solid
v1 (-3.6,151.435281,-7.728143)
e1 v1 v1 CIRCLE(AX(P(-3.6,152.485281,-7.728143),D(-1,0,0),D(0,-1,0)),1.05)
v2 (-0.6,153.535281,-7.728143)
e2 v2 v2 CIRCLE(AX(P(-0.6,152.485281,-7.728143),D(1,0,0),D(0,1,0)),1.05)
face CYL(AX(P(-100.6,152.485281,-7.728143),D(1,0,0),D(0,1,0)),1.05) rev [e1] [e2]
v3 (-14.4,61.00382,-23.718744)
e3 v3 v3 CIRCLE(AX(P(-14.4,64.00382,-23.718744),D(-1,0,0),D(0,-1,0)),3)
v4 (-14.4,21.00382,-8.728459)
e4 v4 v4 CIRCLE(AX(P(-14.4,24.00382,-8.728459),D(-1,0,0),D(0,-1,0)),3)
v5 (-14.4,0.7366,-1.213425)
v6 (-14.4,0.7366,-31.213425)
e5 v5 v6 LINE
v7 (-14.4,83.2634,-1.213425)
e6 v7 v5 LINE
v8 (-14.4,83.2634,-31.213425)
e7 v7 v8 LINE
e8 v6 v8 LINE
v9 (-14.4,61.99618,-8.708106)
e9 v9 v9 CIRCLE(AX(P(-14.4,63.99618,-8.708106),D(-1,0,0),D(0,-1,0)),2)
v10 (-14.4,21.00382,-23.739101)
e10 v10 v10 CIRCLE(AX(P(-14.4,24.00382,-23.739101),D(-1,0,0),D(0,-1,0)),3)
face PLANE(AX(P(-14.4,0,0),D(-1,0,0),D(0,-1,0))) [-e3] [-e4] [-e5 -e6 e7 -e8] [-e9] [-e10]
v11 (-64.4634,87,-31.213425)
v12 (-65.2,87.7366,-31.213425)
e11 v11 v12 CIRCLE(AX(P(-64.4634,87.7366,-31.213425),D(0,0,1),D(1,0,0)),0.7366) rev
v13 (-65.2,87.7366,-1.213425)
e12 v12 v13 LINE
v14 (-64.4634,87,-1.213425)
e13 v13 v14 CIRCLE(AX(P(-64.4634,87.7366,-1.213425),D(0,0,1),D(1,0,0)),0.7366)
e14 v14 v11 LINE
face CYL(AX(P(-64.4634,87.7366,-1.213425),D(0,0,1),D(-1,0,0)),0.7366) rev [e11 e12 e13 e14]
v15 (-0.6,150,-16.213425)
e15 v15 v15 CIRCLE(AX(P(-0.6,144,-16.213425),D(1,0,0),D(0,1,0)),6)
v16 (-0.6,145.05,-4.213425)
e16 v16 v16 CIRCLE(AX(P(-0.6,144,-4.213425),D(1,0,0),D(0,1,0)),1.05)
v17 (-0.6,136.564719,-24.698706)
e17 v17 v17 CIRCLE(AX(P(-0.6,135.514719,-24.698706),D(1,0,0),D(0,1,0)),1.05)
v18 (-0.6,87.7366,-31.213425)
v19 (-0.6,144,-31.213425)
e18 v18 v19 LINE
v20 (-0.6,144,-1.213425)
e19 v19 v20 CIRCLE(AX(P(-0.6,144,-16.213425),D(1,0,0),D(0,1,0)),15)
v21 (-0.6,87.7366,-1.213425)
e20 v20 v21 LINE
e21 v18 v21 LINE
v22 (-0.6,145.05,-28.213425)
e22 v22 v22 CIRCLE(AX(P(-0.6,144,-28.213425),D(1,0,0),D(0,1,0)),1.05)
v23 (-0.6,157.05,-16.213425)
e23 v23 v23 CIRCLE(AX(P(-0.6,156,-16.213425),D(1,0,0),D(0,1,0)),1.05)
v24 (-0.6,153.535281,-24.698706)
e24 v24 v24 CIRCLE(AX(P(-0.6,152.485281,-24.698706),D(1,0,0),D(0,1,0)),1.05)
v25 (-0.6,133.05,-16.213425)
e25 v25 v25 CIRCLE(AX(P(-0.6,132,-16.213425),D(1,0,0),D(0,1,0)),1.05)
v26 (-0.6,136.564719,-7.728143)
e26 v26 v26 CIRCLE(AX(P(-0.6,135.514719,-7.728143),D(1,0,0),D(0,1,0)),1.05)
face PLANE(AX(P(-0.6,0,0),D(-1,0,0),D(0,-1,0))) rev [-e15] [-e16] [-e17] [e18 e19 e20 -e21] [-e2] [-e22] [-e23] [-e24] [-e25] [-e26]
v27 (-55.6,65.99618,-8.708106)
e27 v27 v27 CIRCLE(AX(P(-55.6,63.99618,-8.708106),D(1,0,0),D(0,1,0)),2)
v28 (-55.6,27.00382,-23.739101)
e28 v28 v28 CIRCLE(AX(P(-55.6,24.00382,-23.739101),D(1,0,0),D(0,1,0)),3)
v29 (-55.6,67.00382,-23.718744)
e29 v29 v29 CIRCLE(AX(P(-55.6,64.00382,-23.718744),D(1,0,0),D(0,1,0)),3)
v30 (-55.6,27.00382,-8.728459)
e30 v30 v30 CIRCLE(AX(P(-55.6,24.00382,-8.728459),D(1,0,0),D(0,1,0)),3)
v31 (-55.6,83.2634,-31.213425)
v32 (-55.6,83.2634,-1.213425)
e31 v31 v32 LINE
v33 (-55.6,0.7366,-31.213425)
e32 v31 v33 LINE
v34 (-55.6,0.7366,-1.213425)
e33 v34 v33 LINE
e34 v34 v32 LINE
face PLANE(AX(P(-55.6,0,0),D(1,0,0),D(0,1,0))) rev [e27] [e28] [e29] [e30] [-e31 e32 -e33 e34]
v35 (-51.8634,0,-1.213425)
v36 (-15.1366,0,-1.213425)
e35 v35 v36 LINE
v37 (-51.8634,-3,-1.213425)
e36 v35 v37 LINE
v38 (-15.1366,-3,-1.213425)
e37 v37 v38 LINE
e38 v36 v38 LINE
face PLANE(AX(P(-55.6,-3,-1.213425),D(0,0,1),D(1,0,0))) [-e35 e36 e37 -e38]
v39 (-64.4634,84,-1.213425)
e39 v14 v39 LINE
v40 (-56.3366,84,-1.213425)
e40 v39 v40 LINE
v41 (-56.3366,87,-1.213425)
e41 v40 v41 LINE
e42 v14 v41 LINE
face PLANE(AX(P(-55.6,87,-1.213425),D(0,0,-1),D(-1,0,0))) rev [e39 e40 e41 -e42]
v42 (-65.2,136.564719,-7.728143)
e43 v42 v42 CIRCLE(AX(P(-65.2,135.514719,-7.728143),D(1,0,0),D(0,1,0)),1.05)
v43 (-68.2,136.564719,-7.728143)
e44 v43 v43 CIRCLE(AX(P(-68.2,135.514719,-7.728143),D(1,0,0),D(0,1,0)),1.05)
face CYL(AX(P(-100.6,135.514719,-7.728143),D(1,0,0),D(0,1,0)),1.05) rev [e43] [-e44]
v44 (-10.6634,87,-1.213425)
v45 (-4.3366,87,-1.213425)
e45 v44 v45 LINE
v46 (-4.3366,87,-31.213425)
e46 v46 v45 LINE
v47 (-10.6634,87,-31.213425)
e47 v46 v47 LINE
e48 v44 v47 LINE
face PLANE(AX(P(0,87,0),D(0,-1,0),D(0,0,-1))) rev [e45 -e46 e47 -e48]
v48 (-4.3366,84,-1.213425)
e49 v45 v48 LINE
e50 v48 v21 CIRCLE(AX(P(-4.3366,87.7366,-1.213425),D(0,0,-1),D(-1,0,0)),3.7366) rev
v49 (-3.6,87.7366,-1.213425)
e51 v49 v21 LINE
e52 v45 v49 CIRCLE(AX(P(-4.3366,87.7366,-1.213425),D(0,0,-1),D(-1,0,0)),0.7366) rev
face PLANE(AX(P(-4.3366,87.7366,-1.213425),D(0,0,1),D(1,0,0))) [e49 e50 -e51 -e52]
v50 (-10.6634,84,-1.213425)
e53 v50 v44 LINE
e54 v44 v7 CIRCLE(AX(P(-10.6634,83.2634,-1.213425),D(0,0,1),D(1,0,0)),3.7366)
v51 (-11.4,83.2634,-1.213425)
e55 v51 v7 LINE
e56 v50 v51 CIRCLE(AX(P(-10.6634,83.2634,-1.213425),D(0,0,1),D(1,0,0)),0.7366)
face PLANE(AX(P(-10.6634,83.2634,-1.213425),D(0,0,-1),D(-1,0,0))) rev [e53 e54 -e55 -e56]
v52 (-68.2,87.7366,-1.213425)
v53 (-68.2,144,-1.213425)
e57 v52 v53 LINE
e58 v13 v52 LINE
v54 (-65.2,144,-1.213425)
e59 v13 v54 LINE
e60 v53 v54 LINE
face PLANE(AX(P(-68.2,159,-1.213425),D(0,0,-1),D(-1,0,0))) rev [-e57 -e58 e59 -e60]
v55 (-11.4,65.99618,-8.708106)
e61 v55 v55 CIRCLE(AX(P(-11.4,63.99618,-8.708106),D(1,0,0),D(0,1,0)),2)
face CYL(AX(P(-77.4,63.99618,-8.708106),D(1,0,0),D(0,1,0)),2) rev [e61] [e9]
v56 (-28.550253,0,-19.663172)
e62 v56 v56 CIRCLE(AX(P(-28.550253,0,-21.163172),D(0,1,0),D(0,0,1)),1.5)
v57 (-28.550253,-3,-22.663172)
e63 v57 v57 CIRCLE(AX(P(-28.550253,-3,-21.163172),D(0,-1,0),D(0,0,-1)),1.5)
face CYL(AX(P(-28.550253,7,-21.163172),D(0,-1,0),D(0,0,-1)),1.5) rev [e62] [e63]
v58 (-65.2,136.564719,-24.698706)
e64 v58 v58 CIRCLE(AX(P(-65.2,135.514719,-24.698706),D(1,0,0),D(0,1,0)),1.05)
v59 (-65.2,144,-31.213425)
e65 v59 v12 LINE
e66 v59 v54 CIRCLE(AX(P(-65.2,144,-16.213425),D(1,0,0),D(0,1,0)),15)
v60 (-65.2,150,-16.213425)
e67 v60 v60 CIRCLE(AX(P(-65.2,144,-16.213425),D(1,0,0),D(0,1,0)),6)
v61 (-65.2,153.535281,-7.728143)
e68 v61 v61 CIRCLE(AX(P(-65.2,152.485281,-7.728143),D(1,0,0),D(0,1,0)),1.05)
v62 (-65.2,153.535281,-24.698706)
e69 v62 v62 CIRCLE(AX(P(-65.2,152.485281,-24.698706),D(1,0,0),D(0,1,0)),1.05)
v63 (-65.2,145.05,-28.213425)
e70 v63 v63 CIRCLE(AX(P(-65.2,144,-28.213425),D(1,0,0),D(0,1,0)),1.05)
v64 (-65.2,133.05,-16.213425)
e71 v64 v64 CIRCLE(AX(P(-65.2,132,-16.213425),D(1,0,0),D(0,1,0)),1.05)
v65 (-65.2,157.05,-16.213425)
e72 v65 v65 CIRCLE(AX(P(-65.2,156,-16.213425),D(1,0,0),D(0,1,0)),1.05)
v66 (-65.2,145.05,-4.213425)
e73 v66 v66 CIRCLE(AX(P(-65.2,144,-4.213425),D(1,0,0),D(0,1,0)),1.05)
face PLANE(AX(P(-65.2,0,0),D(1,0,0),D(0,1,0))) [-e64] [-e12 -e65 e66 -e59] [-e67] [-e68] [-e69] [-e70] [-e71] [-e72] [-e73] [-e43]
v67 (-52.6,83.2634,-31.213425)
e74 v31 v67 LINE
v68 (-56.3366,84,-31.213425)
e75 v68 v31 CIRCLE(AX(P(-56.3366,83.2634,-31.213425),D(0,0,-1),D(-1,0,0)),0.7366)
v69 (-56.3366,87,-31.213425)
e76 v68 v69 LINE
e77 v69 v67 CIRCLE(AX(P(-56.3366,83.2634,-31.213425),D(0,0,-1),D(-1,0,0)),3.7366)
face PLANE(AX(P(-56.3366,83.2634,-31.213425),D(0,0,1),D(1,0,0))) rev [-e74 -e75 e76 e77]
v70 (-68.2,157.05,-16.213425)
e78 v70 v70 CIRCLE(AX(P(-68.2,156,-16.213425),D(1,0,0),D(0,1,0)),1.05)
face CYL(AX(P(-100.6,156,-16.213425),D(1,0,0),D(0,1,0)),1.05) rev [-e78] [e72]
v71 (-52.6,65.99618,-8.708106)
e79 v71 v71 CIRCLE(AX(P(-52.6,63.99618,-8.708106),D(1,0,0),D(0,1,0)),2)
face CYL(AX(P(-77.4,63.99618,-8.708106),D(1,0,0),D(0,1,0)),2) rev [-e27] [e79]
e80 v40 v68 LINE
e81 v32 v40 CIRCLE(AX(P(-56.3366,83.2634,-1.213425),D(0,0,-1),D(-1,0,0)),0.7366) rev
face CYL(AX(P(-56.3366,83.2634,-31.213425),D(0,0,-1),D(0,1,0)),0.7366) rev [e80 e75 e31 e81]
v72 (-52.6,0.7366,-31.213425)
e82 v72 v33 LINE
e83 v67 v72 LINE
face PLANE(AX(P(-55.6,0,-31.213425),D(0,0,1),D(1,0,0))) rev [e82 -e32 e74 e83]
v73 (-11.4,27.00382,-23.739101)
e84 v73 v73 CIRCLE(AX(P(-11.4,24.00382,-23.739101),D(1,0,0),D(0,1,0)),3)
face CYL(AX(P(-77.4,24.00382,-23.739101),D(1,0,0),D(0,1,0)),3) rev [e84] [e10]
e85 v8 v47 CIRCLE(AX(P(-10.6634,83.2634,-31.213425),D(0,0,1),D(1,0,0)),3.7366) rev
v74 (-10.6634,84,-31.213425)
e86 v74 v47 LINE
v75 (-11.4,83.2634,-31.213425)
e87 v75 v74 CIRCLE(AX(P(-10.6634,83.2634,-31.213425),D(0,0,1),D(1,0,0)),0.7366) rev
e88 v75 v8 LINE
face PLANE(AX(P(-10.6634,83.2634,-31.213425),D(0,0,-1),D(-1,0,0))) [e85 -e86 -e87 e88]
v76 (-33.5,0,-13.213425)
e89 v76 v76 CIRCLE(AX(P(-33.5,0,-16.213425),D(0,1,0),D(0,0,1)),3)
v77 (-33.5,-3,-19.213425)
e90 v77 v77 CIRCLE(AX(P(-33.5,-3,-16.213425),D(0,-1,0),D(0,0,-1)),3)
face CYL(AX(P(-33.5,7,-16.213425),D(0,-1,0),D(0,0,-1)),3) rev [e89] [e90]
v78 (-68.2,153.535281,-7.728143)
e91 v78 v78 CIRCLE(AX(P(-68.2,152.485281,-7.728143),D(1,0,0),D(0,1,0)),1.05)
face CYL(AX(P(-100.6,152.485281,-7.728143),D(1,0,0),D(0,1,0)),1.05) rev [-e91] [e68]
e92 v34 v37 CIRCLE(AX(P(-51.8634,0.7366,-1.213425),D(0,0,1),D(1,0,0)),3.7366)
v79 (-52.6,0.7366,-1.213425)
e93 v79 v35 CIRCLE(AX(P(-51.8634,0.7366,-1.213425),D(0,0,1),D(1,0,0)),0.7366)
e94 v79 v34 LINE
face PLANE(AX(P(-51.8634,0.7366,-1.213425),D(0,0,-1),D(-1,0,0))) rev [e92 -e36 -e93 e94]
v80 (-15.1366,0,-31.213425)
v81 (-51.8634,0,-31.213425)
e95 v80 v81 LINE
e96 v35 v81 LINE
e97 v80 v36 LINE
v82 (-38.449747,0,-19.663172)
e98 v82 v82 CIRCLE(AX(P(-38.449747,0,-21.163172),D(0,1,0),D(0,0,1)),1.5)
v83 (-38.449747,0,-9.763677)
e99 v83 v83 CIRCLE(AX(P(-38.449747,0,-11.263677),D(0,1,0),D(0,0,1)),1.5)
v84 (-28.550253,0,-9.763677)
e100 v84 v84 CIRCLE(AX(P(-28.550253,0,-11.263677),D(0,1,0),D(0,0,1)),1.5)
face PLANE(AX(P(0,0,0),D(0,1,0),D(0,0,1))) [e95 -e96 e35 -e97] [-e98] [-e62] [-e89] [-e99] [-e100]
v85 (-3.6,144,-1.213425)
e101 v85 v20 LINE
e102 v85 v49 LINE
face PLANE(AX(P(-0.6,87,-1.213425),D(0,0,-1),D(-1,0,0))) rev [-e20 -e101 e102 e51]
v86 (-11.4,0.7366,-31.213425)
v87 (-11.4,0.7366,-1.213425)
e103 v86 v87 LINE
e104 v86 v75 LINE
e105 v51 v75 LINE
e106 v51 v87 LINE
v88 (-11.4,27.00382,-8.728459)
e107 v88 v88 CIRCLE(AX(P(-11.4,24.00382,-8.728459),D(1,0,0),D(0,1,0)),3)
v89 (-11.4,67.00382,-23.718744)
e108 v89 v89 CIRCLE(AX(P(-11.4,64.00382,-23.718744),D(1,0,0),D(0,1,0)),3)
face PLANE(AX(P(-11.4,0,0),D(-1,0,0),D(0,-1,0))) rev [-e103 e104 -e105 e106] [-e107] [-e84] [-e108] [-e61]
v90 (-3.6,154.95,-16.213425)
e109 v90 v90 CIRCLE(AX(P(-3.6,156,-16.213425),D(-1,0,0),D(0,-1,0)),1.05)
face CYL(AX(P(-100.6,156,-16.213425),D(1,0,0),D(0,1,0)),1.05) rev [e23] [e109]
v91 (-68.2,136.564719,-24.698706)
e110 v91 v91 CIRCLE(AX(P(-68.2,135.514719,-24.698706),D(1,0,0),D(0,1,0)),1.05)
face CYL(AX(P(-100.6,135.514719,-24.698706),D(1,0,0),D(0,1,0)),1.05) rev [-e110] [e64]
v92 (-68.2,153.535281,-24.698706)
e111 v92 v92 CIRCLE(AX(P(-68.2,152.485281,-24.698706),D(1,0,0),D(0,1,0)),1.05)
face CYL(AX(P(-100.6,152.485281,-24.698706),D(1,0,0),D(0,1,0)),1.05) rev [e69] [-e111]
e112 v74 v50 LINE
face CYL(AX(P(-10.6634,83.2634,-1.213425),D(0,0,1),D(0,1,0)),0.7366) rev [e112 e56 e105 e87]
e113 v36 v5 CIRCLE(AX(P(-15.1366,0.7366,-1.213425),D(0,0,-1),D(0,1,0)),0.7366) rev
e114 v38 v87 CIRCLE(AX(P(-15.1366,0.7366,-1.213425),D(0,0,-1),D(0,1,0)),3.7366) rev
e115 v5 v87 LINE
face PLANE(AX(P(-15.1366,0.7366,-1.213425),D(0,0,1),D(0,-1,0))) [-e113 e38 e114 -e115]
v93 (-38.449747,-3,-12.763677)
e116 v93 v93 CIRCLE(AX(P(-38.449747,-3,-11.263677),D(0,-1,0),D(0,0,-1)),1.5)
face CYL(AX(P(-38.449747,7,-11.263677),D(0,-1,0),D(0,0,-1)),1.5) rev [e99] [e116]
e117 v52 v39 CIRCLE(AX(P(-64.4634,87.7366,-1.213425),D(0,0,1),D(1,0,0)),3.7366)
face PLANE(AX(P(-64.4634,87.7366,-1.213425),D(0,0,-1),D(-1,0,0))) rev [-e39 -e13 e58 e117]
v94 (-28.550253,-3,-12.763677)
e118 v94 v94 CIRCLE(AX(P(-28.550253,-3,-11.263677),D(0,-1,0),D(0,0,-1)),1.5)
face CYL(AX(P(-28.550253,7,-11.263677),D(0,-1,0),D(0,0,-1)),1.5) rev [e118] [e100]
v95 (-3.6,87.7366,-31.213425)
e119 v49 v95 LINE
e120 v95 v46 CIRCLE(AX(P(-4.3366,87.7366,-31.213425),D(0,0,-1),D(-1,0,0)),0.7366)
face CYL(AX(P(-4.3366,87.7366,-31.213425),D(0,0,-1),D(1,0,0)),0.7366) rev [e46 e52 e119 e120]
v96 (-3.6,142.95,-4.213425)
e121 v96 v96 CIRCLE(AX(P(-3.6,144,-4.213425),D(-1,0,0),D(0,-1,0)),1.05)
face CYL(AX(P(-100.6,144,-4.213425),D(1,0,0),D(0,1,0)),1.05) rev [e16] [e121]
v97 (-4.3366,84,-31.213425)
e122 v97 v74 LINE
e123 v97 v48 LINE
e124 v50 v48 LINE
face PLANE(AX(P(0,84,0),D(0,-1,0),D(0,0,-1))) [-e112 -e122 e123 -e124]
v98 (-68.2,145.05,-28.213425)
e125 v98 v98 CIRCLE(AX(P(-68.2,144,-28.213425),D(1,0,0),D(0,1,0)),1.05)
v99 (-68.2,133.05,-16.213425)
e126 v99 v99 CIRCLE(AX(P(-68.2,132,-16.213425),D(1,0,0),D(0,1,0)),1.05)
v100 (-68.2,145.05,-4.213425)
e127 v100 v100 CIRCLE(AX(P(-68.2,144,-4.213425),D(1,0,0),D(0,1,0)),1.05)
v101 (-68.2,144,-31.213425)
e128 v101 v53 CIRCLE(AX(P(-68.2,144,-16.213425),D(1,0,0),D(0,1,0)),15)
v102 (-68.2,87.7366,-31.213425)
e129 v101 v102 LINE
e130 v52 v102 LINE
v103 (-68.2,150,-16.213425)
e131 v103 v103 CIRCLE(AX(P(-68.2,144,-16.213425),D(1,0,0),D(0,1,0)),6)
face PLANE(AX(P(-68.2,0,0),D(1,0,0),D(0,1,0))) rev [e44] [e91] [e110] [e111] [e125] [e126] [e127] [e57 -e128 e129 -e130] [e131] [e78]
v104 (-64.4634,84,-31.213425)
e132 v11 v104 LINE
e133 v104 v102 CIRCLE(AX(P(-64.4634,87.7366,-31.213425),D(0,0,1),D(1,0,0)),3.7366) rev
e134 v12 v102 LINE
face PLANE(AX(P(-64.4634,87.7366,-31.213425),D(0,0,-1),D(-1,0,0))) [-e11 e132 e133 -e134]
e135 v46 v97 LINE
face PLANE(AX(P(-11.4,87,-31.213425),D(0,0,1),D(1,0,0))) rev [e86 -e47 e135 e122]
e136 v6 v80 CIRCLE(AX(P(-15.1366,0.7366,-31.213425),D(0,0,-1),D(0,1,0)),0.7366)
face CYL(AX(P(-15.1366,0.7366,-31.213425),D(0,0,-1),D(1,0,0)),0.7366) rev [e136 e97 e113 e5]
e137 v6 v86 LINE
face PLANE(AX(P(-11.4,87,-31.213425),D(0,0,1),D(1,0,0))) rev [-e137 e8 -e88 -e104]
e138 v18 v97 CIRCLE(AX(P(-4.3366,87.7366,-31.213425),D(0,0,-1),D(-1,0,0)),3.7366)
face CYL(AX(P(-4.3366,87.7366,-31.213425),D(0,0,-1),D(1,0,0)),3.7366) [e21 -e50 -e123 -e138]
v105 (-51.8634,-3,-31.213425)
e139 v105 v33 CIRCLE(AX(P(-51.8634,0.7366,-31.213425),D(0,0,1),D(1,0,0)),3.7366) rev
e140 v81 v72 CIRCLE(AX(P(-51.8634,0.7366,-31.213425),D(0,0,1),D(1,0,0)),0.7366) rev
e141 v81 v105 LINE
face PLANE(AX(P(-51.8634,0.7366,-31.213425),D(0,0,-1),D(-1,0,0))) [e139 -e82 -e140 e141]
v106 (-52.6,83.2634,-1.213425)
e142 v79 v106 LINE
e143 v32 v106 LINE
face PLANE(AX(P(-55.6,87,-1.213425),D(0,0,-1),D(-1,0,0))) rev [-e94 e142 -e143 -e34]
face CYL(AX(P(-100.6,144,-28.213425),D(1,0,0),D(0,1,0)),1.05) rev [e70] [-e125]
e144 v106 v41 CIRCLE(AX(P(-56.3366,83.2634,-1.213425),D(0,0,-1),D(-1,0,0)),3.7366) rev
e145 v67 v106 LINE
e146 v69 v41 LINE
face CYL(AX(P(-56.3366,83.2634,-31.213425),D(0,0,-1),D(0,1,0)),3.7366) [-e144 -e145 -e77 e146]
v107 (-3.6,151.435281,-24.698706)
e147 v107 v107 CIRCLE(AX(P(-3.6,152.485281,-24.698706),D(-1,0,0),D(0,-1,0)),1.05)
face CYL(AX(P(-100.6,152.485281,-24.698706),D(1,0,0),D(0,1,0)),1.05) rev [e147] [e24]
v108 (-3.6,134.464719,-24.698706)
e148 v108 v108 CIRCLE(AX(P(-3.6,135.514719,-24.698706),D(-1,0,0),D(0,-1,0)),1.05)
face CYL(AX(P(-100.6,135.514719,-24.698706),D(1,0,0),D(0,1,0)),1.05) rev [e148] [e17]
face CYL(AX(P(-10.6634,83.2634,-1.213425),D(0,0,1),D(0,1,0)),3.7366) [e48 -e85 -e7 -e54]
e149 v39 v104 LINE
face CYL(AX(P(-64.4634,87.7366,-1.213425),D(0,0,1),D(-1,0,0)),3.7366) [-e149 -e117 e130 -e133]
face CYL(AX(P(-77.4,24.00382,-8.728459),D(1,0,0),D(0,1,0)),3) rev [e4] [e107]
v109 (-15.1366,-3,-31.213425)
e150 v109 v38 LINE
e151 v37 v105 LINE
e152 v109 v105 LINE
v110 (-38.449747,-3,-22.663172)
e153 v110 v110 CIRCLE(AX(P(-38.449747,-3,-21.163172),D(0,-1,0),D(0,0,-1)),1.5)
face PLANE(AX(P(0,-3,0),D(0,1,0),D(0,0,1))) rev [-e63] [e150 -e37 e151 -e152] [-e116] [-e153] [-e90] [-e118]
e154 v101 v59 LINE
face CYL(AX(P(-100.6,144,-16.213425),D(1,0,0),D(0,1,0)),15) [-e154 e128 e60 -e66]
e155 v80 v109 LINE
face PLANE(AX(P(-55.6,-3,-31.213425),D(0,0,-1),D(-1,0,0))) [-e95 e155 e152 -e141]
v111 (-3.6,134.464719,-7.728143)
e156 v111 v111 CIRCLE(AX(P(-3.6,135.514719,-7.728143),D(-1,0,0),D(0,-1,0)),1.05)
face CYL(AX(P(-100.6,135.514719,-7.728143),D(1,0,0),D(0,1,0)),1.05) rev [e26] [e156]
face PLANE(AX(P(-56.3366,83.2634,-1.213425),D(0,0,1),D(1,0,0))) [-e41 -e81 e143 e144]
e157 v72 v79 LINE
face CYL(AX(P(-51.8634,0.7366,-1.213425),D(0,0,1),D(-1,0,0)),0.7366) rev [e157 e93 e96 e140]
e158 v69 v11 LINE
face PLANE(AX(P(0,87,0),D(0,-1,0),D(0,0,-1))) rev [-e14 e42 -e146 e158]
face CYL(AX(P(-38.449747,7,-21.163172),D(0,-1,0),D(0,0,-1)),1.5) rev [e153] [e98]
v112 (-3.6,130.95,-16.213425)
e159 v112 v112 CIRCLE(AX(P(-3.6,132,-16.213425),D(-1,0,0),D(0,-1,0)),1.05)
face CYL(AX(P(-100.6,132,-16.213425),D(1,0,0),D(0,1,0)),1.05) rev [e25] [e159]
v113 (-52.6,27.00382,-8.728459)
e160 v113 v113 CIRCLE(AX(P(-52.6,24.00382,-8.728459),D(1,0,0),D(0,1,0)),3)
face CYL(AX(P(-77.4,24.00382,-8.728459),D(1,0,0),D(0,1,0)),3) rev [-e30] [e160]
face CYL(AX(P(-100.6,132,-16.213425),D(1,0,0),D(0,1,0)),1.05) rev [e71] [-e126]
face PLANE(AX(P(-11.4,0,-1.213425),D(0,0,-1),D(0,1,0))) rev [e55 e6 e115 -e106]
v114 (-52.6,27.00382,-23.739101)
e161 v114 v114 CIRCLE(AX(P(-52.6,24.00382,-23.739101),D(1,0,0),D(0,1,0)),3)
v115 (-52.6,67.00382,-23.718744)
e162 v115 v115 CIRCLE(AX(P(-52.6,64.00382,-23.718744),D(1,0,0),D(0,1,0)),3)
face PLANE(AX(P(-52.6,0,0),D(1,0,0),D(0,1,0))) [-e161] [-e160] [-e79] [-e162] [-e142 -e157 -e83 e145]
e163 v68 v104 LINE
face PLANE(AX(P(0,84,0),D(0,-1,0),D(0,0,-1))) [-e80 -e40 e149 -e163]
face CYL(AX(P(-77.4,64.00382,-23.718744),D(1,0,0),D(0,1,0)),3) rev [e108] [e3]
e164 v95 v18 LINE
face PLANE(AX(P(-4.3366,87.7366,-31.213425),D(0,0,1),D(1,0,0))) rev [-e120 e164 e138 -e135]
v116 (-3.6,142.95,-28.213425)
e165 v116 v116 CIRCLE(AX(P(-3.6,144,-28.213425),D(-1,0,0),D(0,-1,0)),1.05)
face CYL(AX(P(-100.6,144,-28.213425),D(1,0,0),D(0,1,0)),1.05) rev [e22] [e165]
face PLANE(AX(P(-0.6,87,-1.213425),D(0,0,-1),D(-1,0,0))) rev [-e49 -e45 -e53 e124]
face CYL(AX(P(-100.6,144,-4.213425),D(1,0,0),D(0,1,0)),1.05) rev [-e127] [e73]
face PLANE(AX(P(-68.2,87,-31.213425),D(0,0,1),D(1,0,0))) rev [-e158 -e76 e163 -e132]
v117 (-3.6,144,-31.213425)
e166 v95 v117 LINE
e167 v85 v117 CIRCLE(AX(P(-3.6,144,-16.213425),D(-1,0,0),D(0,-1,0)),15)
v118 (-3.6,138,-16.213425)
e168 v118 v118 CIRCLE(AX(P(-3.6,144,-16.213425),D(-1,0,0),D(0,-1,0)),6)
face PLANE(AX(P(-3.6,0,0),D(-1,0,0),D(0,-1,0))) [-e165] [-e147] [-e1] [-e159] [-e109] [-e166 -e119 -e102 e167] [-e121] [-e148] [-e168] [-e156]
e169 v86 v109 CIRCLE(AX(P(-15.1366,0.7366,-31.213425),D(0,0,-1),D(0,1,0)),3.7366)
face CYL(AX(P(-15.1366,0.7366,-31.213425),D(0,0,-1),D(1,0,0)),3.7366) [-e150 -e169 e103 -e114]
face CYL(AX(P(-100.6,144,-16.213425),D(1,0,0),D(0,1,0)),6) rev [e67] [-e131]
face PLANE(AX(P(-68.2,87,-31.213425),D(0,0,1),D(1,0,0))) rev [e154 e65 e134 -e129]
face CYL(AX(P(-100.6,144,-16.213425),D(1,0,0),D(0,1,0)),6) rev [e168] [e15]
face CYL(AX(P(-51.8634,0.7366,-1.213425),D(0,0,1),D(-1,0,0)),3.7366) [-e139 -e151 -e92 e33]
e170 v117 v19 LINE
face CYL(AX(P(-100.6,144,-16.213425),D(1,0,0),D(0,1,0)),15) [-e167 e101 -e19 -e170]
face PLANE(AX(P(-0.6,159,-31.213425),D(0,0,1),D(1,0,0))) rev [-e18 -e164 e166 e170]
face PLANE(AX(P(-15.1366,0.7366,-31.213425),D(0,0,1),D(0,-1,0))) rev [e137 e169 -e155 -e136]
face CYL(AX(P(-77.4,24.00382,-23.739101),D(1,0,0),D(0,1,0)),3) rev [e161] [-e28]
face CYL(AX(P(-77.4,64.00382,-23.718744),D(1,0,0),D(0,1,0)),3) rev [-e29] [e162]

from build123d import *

# Parameters (mm, degrees)
SKETCH_1_W                       = 44.2
SKETCH_1_H                       = 30
SM_BASE_FLANGE_1_DEPTH           = 3
SM_EDGE_FLANGE_1_STRIP_W         = 13.4732
SM_EDGE_FLANGE_1_STRIP_H         = 3
SM_EDGE_FLANGE_1_STRIP_CUT_DEPTH = 30
SM_EDGE_FLANGE_1_DEPTH           = 30
SM_EDGE_FLANGE_2_STRIP_W         = 13.4732
SM_EDGE_FLANGE_2_STRIP_H         = 3
SM_EDGE_FLANGE_2_STRIP_CUT_DEPTH = 30
SM_EDGE_FLANGE_2_DEPTH           = 30
SM_EDGE_FLANGE_3_STRIP_W         = 13.4732
SM_EDGE_FLANGE_3_STRIP_H         = 3
SM_EDGE_FLANGE_3_STRIP_CUT_DEPTH = 30
SM_EDGE_FLANGE_3_DEPTH           = 30
SM_EDGE_FLANGE_4_STRIP_W         = 13.4732
SM_EDGE_FLANGE_4_STRIP_H         = 3
SM_EDGE_FLANGE_4_STRIP_CUT_DEPTH = 30
SM_EDGE_FLANGE_4_DEPTH           = 30
SM_EDGE_FLANGE_5_STRIP_W         = 13.4732
SM_EDGE_FLANGE_5_STRIP_H         = 3
SM_EDGE_FLANGE_5_STRIP_CUT_DEPTH = 30
SM_EDGE_FLANGE_5_DEPTH           = 30
SM_EDGE_FLANGE_6_STRIP_W         = 13.4732
SM_EDGE_FLANGE_6_STRIP_H         = 3
SM_EDGE_FLANGE_6_STRIP_CUT_DEPTH = 30
SM_EDGE_FLANGE_6_DEPTH           = 30
SKETCH_20_R                      = 6
SKETCH_20_R_2                    = 1.05
CUT_EXTRUDE_1_DEPTH              = 100
SKETCH_21_R                      = 3
SKETCH_21_R_2                    = 1.5
CUT_EXTRUDE_2_DEPTH              = 10
SKETCH_22_R                      = 3
CUT_EXTRUDE_3_DEPTH              = 66


# Sheet-metal steps are written as plain solids
with BuildPart() as part:
    # Sketch 1 → 基体-法兰1 (new body)
    with BuildSketch(Plane(origin=(0, 0, 0), x_dir=(1, 0, 0), z_dir=(0, 1, 0))):
        with Locations((-33.5, 16.21342484)):
            Rectangle(SKETCH_1_W, SKETCH_1_H)
    extrude(amount=-SM_BASE_FLANGE_1_DEPTH)

    # 边线-法兰1 strip (across the edge) → 边线-法兰1 strip cut (cut)
    with BuildSketch(Plane(origin=(-55.6, 0, -31.21342484), x_dir=(1, 0, 0), z_dir=(0, 0, 1))):
        with Locations((-3, -1.5)):
            Rectangle(SM_EDGE_FLANGE_1_STRIP_W, SM_EDGE_FLANGE_1_STRIP_H)
    extrude(amount=SM_EDGE_FLANGE_1_STRIP_CUT_DEPTH, mode=Mode.SUBTRACT)

    # 边线-法兰1 section (across the edge) → 边线-法兰1 (add)
    with BuildSketch(Plane(origin=(-55.6, 0, -31.21342484), x_dir=(1, 0, 0), z_dir=(0, 0, 1))):
        with BuildLine():
            Line((0, 0.7366), (0, 87))
            Line((0, 87), (3, 87))
            Line((3, 87), (3, 0.7366))
            ThreePointArc((3, 0.7366), (3.215745145, 0.215745145), (3.7366, 0))
            Line((3.7366, 0), (3.7366, -3))
            ThreePointArc((3.7366, -3), (1.094424801, -1.905575199), (0, 0.7366))
        make_face()
    extrude(amount=SM_EDGE_FLANGE_1_DEPTH)

    # 边线-法兰2 strip (across the edge) → 边线-法兰2 strip cut (cut)
    with BuildSketch(Plane(origin=(-11.4, 0, -1.21342484), x_dir=(-1, 0, 0), z_dir=(0, 0, -1))):
        with Locations((-3, -1.5)):
            Rectangle(SM_EDGE_FLANGE_2_STRIP_W, SM_EDGE_FLANGE_2_STRIP_H)
    extrude(amount=SM_EDGE_FLANGE_2_STRIP_CUT_DEPTH, mode=Mode.SUBTRACT)

    # 边线-法兰2 section (across the edge) → 边线-法兰2 (add)
    with BuildSketch(Plane(origin=(-11.4, 0, -1.21342484), x_dir=(-1, 0, 0), z_dir=(0, 0, -1))):
        with BuildLine():
            Line((0, 0.7366), (0, 87))
            Line((0, 87), (3, 87))
            Line((3, 87), (3, 0.7366))
            ThreePointArc((3, 0.7366), (3.215745145, 0.215745145), (3.7366, 0))
            Line((3.7366, 0), (3.7366, -3))
            ThreePointArc((3.7366, -3), (1.094424801, -1.905575199), (0, 0.7366))
        make_face()
    extrude(amount=SM_EDGE_FLANGE_2_DEPTH)

    # 边线-法兰3 strip (across the edge) → 边线-法兰3 strip cut (cut)
    with BuildSketch(Plane(origin=(-11.4, 87, -31.21342484), x_dir=(0, -1, 0), z_dir=(0, 0, 1))):
        with Locations((-3, -1.5)):
            Rectangle(SM_EDGE_FLANGE_3_STRIP_W, SM_EDGE_FLANGE_3_STRIP_H)
    extrude(amount=SM_EDGE_FLANGE_3_STRIP_CUT_DEPTH, mode=Mode.SUBTRACT)

    # 边线-法兰3 section (across the edge) → 边线-法兰3 (add)
    with BuildSketch(Plane(origin=(-11.4, 87, -31.21342484), x_dir=(0, -1, 0), z_dir=(0, 0, 1))):
        with BuildLine():
            Line((0, 0.7366), (0, 10.8))
            Line((0, 10.8), (3, 10.8))
            Line((3, 10.8), (3, 0.7366))
            ThreePointArc((3, 0.7366), (3.215745145, 0.215745145), (3.7366, 0))
            Line((3.7366, 0), (3.7366, -3))
            ThreePointArc((3.7366, -3), (1.094424801, -1.905575199), (0, 0.7366))
        make_face()
    extrude(amount=SM_EDGE_FLANGE_3_DEPTH)

    # 边线-法兰4 strip (across the edge) → 边线-法兰4 strip cut (cut)
    with BuildSketch(Plane(origin=(-55.6, 87, -1.21342484), x_dir=(0, -1, 0), z_dir=(0, 0, -1))):
        with Locations((-3, -1.5)):
            Rectangle(SM_EDGE_FLANGE_4_STRIP_W, SM_EDGE_FLANGE_4_STRIP_H)
    extrude(amount=SM_EDGE_FLANGE_4_STRIP_CUT_DEPTH, mode=Mode.SUBTRACT)

    # 边线-法兰4 section (across the edge) → 边线-法兰4 (add)
    with BuildSketch(Plane(origin=(-55.6, 87, -1.21342484), x_dir=(0, -1, 0), z_dir=(0, 0, -1))):
        with BuildLine():
            Line((0, 0.7366), (0, 12.6))
            Line((0, 12.6), (3, 12.6))
            Line((3, 12.6), (3, 0.7366))
            ThreePointArc((3, 0.7366), (3.215745145, 0.215745145), (3.7366, 0))
            Line((3.7366, 0), (3.7366, -3))
            ThreePointArc((3.7366, -3), (1.094424801, -1.905575199), (0, 0.7366))
        make_face()
    extrude(amount=SM_EDGE_FLANGE_4_DEPTH)

    # 边线-法兰5 strip (across the edge) → 边线-法兰5 strip cut (cut)
    with BuildSketch(Plane(origin=(-68.2, 87, -31.21342484), x_dir=(1, 0, 0), z_dir=(0, 0, 1))):
        with Locations((-3, -1.5)):
            Rectangle(SM_EDGE_FLANGE_5_STRIP_W, SM_EDGE_FLANGE_5_STRIP_H)
    extrude(amount=SM_EDGE_FLANGE_5_STRIP_CUT_DEPTH, mode=Mode.SUBTRACT)

    # 边线-法兰5 section (across the edge) → 边线-法兰5 (add)
    with BuildSketch(Plane(origin=(-68.2, 87, -31.21342484), x_dir=(1, 0, 0), z_dir=(0, 0, 1))):
        with BuildLine():
            Line((0, 0.7366), (0, 72))
            Line((0, 72), (3, 72))
            Line((3, 72), (3, 0.7366))
            ThreePointArc((3, 0.7366), (3.215745145, 0.215745145), (3.7366, 0))
            Line((3.7366, 0), (3.7366, -3))
            ThreePointArc((3.7366, -3), (1.094424801, -1.905575199), (0, 0.7366))
        make_face()
    extrude(amount=SM_EDGE_FLANGE_5_DEPTH)

    # 边线-法兰6 strip (across the edge) → 边线-法兰6 strip cut (cut)
    with BuildSketch(Plane(origin=(-0.6, 87, -1.21342484), x_dir=(-1, 0, 0), z_dir=(0, 0, -1))):
        with Locations((-3, -1.5)):
            Rectangle(SM_EDGE_FLANGE_6_STRIP_W, SM_EDGE_FLANGE_6_STRIP_H)
    extrude(amount=SM_EDGE_FLANGE_6_STRIP_CUT_DEPTH, mode=Mode.SUBTRACT)

    # 边线-法兰6 section (across the edge) → 边线-法兰6 (add)
    with BuildSketch(Plane(origin=(-0.6, 87, -1.21342484), x_dir=(-1, 0, 0), z_dir=(0, 0, -1))):
        with BuildLine():
            Line((0, 0.7366), (0, 72))
            Line((0, 72), (3, 72))
            Line((3, 72), (3, 0.7366))
            ThreePointArc((3, 0.7366), (3.215745145, 0.215745145), (3.7366, 0))
            Line((3.7366, 0), (3.7366, -3))
            ThreePointArc((3.7366, -3), (1.094424801, -1.905575199), (0, 0.7366))
        make_face()
    extrude(amount=SM_EDGE_FLANGE_6_DEPTH)

    # 草图20 → 切除-拉伸1 (cut)
    with BuildSketch(Plane(origin=(-0.6, 0, 0), x_dir=(0, 0, -1), z_dir=(1, 0, 0))):
        with Locations(Location((16.21342484, 144, 0), (0, 0, 90))):
            Circle(SKETCH_20_R)
        with Locations(Location((16.21342484, 156, 0), (0, 0, 90))):
            Circle(SKETCH_20_R_2)
        with BuildLine():
            ThreePointArc((1.21342484, 144), (5.606823122, 154.606601718), (16.21342484, 159))
            Line((16.21342484, 159), (1.21342484, 159))
            Line((1.21342484, 159), (1.21342484, 144))
        make_face()
        with BuildLine():
            Line((31.21342484, 159), (16.21342484, 159))
            ThreePointArc((16.21342484, 159), (26.820026558, 154.606601718), (31.21342484, 144))
            Line((31.21342484, 144), (31.21342484, 159))
        make_face()
        with Locations(Location((24.698706214, 152.485281374, 0), (0, 0, 90))):
            Circle(SKETCH_20_R_2)
        with Locations(Location((28.21342484, 144, 0), (0, 0, 90))):
            Circle(SKETCH_20_R_2)
        with Locations(Location((24.698706214, 135.514718626, 0), (0, 0, 90))):
            Circle(SKETCH_20_R_2)
        with Locations(Location((16.21342484, 132, 0), (0, 0, 90))):
            Circle(SKETCH_20_R_2)
        with Locations(Location((7.728143465, 135.514718626, 0), (0, 0, 90))):
            Circle(SKETCH_20_R_2)
        with Locations(Location((4.21342484, 144, 0), (0, 0, 90))):
            Circle(SKETCH_20_R_2)
        with Locations(Location((7.728143465, 152.485281374, 0), (0, 0, 90))):
            Circle(SKETCH_20_R_2)
    extrude(amount=-CUT_EXTRUDE_1_DEPTH, mode=Mode.SUBTRACT)

    # 草图21 → 切除-拉伸2 (cut)
    with BuildSketch(Plane.XZ.offset(3)):
        with Locations(Location((-33.5, -16.21342484, 0), (0, 0, 270))):
            Circle(SKETCH_21_R)
        with Locations(Location((-28.550252532, -11.263677371, 0), (0, 0, 270))):
            Circle(SKETCH_21_R_2)
        with Locations(Location((-28.550252532, -21.163172308, 0), (0, 0, 270))):
            Circle(SKETCH_21_R_2)
        with Locations(Location((-38.449747468, -21.163172308, 0), (0, 0, 270))):
            Circle(SKETCH_21_R_2)
        with Locations(Location((-38.449747468, -11.263677371, 0), (0, 0, 270))):
            Circle(SKETCH_21_R_2)
    extrude(amount=-CUT_EXTRUDE_2_DEPTH, mode=Mode.SUBTRACT)

    # 草图22 → 切除-拉伸3 (cut)
    with BuildSketch(Plane(origin=(-11.4, 0, 0), x_dir=(0, 0, -1), z_dir=(1, 0, 0))):
        with BuildLine():
            ThreePointArc((10.708105598, 63.997198238), (7.293172758, 65.40967406), (8.709123695, 61.996180659))
            Line((8.709123695, 61.996180659), (8.708105857, 63.9961804))
            Line((8.708105857, 63.9961804), (10.708105598, 63.997198238))
        make_face()
        with BuildLine():
            Line((8.708105857, 63.9961804), (8.709123695, 61.996180659))
            ThreePointArc((8.709123695, 61.996180659), (10.122679234, 62.582326744), (10.708105857, 63.9961804))
            ThreePointArc((10.708105857, 63.9961804), (10.708105793, 63.996689319), (10.708105598, 63.997198238))
            Line((10.708105598, 63.997198238), (8.708105857, 63.9961804))
        make_face()
        with Locations(Location((23.739100582, 24.0038196, 0), (0, 0, 90))):
            Circle(SKETCH_22_R)
        with Locations(Location((8.72845873, 24.0038196, 0), (0, 0, 90))):
            Circle(SKETCH_22_R)
        with Locations(Location((23.718743822, 64.0038196, 0), (0, 0, 90))):
            Circle(SKETCH_22_R)
    extrude(amount=-CUT_EXTRUDE_3_DEPTH, mode=Mode.SUBTRACT)


solid = part.part
